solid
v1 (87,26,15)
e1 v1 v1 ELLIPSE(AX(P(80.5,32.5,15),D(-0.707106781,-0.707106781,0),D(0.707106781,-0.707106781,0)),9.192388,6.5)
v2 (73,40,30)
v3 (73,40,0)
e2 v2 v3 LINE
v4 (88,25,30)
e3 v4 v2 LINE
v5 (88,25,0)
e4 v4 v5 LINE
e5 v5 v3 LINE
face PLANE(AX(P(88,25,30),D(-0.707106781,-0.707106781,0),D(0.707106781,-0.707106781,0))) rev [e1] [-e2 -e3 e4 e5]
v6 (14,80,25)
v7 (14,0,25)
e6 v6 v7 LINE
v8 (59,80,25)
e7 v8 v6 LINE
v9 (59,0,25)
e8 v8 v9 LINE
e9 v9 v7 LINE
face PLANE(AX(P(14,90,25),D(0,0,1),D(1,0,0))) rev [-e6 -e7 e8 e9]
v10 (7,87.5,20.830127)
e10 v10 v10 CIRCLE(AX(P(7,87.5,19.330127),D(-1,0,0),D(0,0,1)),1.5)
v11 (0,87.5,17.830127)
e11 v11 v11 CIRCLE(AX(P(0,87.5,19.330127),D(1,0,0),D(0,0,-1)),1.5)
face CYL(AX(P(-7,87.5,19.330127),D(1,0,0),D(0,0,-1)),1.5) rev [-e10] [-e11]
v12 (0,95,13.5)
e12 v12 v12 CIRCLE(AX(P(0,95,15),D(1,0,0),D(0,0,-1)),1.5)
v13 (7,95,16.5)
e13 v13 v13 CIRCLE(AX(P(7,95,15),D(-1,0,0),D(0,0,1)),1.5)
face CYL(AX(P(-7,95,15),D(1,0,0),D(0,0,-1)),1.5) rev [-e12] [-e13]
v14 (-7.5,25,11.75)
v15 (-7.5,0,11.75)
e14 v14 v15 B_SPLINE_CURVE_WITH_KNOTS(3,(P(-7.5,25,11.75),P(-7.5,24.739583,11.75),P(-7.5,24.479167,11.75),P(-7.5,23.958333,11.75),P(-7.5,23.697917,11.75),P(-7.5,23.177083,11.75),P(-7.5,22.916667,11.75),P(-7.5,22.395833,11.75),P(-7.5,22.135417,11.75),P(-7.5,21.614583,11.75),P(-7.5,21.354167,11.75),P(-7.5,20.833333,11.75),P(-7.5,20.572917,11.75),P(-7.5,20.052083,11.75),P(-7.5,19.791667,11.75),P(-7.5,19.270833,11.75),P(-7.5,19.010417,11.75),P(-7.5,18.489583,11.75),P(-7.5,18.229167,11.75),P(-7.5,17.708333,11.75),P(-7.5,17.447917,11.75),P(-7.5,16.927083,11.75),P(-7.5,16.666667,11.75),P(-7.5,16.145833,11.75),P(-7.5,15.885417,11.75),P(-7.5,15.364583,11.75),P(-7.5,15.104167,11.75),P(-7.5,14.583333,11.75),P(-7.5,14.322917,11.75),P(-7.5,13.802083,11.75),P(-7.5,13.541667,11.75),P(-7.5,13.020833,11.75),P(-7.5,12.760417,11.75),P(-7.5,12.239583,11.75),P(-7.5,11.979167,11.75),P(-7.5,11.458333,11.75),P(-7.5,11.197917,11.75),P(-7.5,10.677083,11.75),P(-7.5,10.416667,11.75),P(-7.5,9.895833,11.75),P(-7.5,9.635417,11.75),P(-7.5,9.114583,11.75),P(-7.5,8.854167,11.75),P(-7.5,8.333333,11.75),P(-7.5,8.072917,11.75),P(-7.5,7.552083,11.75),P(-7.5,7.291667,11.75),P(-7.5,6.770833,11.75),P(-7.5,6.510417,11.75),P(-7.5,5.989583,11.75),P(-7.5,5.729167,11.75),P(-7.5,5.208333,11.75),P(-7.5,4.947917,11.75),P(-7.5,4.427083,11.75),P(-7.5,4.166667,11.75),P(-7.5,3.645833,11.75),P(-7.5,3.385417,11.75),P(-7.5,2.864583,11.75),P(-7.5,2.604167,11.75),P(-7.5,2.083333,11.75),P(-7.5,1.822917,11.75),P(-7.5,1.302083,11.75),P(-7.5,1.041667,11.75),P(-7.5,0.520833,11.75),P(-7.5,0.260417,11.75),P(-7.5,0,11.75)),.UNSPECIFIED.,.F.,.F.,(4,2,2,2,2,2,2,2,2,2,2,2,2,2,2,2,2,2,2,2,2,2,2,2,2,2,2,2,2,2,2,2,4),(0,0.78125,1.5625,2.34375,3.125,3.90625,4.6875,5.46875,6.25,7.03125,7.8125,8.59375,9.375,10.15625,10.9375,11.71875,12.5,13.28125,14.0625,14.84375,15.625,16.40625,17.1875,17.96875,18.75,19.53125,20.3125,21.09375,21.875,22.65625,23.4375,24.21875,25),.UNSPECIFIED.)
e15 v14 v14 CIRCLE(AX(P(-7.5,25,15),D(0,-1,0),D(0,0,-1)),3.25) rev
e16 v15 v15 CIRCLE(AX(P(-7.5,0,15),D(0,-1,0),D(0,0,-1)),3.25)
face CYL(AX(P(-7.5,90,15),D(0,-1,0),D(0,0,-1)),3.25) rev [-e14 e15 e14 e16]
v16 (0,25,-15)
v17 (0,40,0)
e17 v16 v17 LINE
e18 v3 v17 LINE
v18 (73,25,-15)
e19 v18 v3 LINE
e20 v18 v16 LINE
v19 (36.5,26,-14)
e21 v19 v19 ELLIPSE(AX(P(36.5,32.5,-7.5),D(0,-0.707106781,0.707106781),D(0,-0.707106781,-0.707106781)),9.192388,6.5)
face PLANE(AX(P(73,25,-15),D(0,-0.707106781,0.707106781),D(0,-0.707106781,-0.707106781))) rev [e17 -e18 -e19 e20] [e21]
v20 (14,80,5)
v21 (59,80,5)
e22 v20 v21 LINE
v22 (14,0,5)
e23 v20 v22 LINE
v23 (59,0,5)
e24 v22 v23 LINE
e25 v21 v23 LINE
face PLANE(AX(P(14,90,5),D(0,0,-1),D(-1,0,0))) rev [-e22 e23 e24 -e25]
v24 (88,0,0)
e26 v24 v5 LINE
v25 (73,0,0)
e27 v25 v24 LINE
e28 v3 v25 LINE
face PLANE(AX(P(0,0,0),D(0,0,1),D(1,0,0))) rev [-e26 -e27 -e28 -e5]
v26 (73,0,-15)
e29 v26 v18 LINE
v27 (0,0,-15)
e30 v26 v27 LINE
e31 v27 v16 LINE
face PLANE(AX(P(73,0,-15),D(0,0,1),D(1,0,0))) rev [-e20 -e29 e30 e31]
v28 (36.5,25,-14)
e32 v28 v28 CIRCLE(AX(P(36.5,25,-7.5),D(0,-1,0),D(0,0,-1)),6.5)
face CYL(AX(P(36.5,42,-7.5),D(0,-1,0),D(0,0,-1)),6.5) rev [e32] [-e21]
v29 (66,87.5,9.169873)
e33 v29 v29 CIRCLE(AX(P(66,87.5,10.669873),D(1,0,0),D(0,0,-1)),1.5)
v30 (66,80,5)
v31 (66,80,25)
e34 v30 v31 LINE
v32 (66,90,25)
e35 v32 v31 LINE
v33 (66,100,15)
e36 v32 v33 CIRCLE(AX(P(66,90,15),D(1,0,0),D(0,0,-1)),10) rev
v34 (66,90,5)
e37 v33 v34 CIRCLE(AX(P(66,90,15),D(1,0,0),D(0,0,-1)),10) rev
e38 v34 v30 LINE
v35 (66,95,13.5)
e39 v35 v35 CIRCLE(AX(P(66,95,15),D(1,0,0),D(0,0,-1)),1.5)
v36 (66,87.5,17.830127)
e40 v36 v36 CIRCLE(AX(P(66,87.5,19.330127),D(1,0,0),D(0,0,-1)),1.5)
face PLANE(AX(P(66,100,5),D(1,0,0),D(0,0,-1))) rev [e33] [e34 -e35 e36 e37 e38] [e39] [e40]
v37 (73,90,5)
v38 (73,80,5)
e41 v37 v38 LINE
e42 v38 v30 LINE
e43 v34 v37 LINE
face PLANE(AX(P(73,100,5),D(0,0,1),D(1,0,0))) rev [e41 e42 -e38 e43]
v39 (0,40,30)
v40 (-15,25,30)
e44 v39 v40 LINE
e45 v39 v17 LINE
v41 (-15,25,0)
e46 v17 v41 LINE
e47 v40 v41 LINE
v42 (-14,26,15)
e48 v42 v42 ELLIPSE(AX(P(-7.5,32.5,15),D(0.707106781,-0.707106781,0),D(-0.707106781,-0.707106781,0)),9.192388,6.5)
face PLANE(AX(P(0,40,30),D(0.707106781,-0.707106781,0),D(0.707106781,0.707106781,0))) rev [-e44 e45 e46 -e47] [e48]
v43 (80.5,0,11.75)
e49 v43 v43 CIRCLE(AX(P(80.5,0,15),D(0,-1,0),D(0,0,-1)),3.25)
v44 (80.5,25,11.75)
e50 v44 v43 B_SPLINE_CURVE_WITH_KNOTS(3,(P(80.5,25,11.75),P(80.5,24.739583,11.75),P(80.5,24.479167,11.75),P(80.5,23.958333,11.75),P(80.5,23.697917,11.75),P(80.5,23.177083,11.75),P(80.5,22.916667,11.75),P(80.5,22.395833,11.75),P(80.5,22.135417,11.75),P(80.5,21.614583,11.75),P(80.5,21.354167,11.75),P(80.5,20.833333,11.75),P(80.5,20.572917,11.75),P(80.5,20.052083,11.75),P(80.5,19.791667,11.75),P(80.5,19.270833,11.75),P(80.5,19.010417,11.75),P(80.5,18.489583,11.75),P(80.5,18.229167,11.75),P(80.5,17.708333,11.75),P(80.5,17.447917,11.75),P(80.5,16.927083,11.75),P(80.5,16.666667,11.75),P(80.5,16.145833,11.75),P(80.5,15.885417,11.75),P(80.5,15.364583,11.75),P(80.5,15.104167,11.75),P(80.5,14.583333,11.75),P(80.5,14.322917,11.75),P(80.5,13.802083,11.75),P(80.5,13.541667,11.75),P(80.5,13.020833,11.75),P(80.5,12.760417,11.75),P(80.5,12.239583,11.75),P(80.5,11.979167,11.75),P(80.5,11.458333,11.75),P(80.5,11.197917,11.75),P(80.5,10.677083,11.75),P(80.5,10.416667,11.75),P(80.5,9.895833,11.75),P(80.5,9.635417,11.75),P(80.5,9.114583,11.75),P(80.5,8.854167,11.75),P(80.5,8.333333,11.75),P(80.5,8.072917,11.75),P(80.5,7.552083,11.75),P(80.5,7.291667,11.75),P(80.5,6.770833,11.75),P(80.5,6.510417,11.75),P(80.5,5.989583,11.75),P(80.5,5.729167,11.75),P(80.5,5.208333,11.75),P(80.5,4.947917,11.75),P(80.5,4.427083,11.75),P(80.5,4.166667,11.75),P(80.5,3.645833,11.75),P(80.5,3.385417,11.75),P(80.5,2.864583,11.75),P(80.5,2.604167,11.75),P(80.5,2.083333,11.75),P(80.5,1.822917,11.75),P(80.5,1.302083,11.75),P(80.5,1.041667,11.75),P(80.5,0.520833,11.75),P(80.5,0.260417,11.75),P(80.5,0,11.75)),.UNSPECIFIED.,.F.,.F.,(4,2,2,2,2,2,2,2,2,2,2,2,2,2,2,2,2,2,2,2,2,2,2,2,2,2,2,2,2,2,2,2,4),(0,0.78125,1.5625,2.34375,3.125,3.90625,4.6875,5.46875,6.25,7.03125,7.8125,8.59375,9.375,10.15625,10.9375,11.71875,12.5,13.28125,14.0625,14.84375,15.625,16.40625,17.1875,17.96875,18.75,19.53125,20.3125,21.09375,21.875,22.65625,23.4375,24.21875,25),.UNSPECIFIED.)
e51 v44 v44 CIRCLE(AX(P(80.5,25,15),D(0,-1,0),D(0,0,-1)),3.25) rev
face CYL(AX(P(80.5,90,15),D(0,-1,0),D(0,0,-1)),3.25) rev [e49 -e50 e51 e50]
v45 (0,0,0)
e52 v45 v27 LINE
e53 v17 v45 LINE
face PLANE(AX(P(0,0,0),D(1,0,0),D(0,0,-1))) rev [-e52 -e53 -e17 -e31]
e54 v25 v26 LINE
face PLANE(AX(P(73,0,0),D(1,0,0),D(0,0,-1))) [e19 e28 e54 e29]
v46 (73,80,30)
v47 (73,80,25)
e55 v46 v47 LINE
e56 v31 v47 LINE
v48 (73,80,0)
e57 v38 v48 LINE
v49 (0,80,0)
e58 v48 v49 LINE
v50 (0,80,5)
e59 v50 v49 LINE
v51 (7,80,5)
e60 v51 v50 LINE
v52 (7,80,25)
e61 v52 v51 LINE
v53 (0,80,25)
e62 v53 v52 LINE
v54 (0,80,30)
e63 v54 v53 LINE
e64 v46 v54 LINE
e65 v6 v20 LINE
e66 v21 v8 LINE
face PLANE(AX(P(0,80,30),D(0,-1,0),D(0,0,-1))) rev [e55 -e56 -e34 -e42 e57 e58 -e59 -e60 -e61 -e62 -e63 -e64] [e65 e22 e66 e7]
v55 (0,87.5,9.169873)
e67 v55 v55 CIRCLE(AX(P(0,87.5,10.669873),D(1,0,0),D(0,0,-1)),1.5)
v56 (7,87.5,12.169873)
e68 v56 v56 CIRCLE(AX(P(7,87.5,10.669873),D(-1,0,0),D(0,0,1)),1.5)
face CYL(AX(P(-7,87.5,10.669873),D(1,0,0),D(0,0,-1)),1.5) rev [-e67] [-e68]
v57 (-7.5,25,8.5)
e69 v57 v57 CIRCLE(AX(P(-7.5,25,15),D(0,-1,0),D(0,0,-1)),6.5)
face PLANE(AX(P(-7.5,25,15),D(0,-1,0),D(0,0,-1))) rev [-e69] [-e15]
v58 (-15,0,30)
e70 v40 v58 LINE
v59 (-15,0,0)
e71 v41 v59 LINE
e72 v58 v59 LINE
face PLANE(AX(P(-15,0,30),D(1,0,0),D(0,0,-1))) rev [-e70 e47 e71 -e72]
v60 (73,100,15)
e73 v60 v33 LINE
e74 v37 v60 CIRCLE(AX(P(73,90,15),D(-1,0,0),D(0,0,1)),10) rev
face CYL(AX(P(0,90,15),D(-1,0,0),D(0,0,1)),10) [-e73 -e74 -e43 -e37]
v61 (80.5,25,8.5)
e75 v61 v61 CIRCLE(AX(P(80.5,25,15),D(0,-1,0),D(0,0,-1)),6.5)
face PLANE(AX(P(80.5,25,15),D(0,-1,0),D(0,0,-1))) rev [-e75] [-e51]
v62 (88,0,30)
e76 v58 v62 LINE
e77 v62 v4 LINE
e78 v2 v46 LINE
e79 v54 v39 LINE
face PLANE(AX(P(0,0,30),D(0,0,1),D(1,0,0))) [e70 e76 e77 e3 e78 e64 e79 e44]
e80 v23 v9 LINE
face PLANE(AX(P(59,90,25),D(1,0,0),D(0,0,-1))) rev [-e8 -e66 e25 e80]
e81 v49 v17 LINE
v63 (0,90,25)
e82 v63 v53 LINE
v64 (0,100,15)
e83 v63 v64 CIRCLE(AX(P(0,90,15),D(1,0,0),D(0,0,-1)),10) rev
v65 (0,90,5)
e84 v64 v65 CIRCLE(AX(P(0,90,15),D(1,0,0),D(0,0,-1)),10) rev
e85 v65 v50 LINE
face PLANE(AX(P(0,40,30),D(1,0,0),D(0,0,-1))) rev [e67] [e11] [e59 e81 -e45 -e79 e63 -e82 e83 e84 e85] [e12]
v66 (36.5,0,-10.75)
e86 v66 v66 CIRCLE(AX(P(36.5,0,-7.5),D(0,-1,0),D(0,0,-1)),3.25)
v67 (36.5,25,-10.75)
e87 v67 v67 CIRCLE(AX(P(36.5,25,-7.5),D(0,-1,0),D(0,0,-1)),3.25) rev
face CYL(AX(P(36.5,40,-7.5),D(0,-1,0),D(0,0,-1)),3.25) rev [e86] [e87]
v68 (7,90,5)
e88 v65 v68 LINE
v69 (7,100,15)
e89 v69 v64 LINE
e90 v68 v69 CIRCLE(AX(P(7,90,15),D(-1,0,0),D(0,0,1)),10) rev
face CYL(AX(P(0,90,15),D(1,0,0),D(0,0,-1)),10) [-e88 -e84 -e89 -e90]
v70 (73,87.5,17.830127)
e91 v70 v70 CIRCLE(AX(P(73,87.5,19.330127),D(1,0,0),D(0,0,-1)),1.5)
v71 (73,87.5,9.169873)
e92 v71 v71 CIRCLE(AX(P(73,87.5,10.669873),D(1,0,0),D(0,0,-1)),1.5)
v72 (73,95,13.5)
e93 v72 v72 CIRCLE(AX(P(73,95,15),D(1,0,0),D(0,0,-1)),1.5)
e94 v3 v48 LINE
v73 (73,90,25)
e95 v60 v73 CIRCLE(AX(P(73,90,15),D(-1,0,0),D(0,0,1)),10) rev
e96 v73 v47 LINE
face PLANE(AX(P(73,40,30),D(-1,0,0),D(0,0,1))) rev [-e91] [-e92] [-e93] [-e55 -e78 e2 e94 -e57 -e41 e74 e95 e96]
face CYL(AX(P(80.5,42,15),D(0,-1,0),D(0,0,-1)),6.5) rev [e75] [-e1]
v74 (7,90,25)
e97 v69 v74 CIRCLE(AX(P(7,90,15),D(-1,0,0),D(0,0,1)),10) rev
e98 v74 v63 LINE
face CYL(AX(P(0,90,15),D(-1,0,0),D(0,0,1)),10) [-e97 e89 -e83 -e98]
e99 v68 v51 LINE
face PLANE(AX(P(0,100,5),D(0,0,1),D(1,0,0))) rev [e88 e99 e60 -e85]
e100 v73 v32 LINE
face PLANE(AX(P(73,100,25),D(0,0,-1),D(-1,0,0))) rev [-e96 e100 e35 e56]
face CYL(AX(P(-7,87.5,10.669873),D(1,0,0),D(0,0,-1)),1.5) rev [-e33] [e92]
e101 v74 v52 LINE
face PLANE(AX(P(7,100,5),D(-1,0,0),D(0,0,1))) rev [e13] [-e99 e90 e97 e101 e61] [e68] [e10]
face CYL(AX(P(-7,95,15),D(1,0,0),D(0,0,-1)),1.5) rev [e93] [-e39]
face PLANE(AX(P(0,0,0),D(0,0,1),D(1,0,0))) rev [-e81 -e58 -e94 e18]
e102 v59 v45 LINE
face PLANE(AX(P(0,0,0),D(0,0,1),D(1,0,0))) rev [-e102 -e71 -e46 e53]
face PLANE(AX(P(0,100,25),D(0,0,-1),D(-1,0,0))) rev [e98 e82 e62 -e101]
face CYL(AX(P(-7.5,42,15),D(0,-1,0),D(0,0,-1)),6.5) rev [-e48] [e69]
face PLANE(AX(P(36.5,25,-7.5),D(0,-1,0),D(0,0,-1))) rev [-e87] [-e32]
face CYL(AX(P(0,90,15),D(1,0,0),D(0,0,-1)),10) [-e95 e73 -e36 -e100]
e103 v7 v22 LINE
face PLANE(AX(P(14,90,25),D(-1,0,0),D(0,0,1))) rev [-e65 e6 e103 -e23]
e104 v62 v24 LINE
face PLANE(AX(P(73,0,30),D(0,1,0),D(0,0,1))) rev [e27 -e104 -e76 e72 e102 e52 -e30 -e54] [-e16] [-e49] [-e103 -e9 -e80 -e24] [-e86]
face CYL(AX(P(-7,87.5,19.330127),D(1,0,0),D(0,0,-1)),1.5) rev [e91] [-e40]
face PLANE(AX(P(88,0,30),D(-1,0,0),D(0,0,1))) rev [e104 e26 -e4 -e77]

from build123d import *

# Parameters (mm, degrees)
BOSS_EXTRUDE1_DEPTH = 30
SKETCH2_R           = 3.25
SKETCH2_W           = 45
SKETCH2_H           = 20
CUT_EXTRUDE1_DEPTH  = 90
SKETCH3_W           = 7
SKETCH3_H           = 20
BOSS_EXTRUDE2_DEPTH = 20
SKETCH4_R           = 1.5
CUT_EXTRUDE2_DEPTH  = 80
FILLET1_R           = 10
CUT_EXTRUDE3_START  = -25
SKETCH5_R           = 6.5
CUT_EXTRUDE3_DEPTH  = 17
BOSS_EXTRUDE3_DEPTH = 73
SKETCH7_R           = 3.25
CUT_EXTRUDE4_DEPTH  = 40
CUT_EXTRUDE5_START  = -25
SKETCH8_R           = 6.5
CUT_EXTRUDE5_DEPTH  = 17


with BuildPart() as part:
    # Sketch1 → Boss-Extrude1 (new body)
    with BuildSketch(Plane.XY):
        Polygon((0, 40), (-15, 25), (-15, 0), (0, 0), (73, 0), (88, 0), (88, 25), (73, 40), (73, 80), (0, 80), align=None)
    extrude(amount=BOSS_EXTRUDE1_DEPTH)

    # Sketch2 → Cut-Extrude1 (cut)
    with BuildSketch(Plane.XZ):
        with Locations(Location((-7.5, 15, 0), (0, 0, 270))):
            Circle(SKETCH2_R)
        with Locations(Location((80.5, 15, 0), (0, 0, 270))):
            Circle(SKETCH2_R)
        with Locations((36.5, 15)):
            Rectangle(SKETCH2_W, SKETCH2_H)
    extrude(amount=-CUT_EXTRUDE1_DEPTH, mode=Mode.SUBTRACT)

    # Sketch3 → Boss-Extrude2 (add)
    with BuildSketch(Plane(origin=(0, 80, 0), x_dir=(1, 0, 0), z_dir=(0, 1, 0))):
        with Locations((3.5, -15)):
            Rectangle(SKETCH3_W, SKETCH3_H)
        with Locations((69.5, -15)):
            Rectangle(SKETCH3_W, SKETCH3_H)
    extrude(amount=BOSS_EXTRUDE2_DEPTH)

    # Sketch4 → Cut-Extrude2 (cut)
    with BuildSketch(Plane(origin=(73, 0, 0), x_dir=(0, 0, -1), z_dir=(1, 0, 0))):
        with Locations((-15, 95)):
            Circle(SKETCH4_R)
        with Locations((-10.669872981, 87.5)):
            Circle(SKETCH4_R)
        with Locations((-19.330127019, 87.5)):
            Circle(SKETCH4_R)
    extrude(amount=-CUT_EXTRUDE2_DEPTH, mode=Mode.SUBTRACT)

    # Fillet1
    fillet1_edges = [part.edges().sort_by_distance(p)[0] for p in [
        (3.5, 100, 25),
        (69.5, 100, 25),
        (3.5, 100, 5),
        (69.5, 100, 5),
    ]]
    fillet(fillet1_edges, radius=FILLET1_R - 0.0001)  # a hair under: the kernel refuses the full size

    # Sketch5 → Cut-Extrude3 (cut)
    with BuildSketch(Plane.XZ.offset(CUT_EXTRUDE3_START)):
        with Locations(Location((-7.5, 15, 0), (0, 0, 270))):
            Circle(SKETCH5_R)
        with Locations(Location((80.5, 15, 0), (0, 0, 270))):
            Circle(SKETCH5_R)
    extrude(amount=-CUT_EXTRUDE3_DEPTH, mode=Mode.SUBTRACT)

    # Sketch6 → Boss-Extrude3 (add)
    with BuildSketch(Plane(origin=(0, 0, 0), x_dir=(0, 0, -1), z_dir=(1, 0, 0))):
        Polygon((0, 40), (0, 0), (15, 0), (15, 25), align=None)
    extrude(amount=BOSS_EXTRUDE3_DEPTH)

    # Sketch7 → Cut-Extrude4 (cut)
    with BuildSketch(Plane.XZ):
        with Locations(Location((36.5, -7.5, 0), (0, 0, 270))):
            Circle(SKETCH7_R)
    extrude(amount=-CUT_EXTRUDE4_DEPTH, mode=Mode.SUBTRACT)

    # Sketch8 → Cut-Extrude5 (cut)
    with BuildSketch(Plane.XZ.offset(CUT_EXTRUDE5_START)):
        with Locations(Location((36.5, -7.5, 0), (0, 0, 270))):
            Circle(SKETCH8_R)
    extrude(amount=-CUT_EXTRUDE5_DEPTH, mode=Mode.SUBTRACT)


solid = part.part
